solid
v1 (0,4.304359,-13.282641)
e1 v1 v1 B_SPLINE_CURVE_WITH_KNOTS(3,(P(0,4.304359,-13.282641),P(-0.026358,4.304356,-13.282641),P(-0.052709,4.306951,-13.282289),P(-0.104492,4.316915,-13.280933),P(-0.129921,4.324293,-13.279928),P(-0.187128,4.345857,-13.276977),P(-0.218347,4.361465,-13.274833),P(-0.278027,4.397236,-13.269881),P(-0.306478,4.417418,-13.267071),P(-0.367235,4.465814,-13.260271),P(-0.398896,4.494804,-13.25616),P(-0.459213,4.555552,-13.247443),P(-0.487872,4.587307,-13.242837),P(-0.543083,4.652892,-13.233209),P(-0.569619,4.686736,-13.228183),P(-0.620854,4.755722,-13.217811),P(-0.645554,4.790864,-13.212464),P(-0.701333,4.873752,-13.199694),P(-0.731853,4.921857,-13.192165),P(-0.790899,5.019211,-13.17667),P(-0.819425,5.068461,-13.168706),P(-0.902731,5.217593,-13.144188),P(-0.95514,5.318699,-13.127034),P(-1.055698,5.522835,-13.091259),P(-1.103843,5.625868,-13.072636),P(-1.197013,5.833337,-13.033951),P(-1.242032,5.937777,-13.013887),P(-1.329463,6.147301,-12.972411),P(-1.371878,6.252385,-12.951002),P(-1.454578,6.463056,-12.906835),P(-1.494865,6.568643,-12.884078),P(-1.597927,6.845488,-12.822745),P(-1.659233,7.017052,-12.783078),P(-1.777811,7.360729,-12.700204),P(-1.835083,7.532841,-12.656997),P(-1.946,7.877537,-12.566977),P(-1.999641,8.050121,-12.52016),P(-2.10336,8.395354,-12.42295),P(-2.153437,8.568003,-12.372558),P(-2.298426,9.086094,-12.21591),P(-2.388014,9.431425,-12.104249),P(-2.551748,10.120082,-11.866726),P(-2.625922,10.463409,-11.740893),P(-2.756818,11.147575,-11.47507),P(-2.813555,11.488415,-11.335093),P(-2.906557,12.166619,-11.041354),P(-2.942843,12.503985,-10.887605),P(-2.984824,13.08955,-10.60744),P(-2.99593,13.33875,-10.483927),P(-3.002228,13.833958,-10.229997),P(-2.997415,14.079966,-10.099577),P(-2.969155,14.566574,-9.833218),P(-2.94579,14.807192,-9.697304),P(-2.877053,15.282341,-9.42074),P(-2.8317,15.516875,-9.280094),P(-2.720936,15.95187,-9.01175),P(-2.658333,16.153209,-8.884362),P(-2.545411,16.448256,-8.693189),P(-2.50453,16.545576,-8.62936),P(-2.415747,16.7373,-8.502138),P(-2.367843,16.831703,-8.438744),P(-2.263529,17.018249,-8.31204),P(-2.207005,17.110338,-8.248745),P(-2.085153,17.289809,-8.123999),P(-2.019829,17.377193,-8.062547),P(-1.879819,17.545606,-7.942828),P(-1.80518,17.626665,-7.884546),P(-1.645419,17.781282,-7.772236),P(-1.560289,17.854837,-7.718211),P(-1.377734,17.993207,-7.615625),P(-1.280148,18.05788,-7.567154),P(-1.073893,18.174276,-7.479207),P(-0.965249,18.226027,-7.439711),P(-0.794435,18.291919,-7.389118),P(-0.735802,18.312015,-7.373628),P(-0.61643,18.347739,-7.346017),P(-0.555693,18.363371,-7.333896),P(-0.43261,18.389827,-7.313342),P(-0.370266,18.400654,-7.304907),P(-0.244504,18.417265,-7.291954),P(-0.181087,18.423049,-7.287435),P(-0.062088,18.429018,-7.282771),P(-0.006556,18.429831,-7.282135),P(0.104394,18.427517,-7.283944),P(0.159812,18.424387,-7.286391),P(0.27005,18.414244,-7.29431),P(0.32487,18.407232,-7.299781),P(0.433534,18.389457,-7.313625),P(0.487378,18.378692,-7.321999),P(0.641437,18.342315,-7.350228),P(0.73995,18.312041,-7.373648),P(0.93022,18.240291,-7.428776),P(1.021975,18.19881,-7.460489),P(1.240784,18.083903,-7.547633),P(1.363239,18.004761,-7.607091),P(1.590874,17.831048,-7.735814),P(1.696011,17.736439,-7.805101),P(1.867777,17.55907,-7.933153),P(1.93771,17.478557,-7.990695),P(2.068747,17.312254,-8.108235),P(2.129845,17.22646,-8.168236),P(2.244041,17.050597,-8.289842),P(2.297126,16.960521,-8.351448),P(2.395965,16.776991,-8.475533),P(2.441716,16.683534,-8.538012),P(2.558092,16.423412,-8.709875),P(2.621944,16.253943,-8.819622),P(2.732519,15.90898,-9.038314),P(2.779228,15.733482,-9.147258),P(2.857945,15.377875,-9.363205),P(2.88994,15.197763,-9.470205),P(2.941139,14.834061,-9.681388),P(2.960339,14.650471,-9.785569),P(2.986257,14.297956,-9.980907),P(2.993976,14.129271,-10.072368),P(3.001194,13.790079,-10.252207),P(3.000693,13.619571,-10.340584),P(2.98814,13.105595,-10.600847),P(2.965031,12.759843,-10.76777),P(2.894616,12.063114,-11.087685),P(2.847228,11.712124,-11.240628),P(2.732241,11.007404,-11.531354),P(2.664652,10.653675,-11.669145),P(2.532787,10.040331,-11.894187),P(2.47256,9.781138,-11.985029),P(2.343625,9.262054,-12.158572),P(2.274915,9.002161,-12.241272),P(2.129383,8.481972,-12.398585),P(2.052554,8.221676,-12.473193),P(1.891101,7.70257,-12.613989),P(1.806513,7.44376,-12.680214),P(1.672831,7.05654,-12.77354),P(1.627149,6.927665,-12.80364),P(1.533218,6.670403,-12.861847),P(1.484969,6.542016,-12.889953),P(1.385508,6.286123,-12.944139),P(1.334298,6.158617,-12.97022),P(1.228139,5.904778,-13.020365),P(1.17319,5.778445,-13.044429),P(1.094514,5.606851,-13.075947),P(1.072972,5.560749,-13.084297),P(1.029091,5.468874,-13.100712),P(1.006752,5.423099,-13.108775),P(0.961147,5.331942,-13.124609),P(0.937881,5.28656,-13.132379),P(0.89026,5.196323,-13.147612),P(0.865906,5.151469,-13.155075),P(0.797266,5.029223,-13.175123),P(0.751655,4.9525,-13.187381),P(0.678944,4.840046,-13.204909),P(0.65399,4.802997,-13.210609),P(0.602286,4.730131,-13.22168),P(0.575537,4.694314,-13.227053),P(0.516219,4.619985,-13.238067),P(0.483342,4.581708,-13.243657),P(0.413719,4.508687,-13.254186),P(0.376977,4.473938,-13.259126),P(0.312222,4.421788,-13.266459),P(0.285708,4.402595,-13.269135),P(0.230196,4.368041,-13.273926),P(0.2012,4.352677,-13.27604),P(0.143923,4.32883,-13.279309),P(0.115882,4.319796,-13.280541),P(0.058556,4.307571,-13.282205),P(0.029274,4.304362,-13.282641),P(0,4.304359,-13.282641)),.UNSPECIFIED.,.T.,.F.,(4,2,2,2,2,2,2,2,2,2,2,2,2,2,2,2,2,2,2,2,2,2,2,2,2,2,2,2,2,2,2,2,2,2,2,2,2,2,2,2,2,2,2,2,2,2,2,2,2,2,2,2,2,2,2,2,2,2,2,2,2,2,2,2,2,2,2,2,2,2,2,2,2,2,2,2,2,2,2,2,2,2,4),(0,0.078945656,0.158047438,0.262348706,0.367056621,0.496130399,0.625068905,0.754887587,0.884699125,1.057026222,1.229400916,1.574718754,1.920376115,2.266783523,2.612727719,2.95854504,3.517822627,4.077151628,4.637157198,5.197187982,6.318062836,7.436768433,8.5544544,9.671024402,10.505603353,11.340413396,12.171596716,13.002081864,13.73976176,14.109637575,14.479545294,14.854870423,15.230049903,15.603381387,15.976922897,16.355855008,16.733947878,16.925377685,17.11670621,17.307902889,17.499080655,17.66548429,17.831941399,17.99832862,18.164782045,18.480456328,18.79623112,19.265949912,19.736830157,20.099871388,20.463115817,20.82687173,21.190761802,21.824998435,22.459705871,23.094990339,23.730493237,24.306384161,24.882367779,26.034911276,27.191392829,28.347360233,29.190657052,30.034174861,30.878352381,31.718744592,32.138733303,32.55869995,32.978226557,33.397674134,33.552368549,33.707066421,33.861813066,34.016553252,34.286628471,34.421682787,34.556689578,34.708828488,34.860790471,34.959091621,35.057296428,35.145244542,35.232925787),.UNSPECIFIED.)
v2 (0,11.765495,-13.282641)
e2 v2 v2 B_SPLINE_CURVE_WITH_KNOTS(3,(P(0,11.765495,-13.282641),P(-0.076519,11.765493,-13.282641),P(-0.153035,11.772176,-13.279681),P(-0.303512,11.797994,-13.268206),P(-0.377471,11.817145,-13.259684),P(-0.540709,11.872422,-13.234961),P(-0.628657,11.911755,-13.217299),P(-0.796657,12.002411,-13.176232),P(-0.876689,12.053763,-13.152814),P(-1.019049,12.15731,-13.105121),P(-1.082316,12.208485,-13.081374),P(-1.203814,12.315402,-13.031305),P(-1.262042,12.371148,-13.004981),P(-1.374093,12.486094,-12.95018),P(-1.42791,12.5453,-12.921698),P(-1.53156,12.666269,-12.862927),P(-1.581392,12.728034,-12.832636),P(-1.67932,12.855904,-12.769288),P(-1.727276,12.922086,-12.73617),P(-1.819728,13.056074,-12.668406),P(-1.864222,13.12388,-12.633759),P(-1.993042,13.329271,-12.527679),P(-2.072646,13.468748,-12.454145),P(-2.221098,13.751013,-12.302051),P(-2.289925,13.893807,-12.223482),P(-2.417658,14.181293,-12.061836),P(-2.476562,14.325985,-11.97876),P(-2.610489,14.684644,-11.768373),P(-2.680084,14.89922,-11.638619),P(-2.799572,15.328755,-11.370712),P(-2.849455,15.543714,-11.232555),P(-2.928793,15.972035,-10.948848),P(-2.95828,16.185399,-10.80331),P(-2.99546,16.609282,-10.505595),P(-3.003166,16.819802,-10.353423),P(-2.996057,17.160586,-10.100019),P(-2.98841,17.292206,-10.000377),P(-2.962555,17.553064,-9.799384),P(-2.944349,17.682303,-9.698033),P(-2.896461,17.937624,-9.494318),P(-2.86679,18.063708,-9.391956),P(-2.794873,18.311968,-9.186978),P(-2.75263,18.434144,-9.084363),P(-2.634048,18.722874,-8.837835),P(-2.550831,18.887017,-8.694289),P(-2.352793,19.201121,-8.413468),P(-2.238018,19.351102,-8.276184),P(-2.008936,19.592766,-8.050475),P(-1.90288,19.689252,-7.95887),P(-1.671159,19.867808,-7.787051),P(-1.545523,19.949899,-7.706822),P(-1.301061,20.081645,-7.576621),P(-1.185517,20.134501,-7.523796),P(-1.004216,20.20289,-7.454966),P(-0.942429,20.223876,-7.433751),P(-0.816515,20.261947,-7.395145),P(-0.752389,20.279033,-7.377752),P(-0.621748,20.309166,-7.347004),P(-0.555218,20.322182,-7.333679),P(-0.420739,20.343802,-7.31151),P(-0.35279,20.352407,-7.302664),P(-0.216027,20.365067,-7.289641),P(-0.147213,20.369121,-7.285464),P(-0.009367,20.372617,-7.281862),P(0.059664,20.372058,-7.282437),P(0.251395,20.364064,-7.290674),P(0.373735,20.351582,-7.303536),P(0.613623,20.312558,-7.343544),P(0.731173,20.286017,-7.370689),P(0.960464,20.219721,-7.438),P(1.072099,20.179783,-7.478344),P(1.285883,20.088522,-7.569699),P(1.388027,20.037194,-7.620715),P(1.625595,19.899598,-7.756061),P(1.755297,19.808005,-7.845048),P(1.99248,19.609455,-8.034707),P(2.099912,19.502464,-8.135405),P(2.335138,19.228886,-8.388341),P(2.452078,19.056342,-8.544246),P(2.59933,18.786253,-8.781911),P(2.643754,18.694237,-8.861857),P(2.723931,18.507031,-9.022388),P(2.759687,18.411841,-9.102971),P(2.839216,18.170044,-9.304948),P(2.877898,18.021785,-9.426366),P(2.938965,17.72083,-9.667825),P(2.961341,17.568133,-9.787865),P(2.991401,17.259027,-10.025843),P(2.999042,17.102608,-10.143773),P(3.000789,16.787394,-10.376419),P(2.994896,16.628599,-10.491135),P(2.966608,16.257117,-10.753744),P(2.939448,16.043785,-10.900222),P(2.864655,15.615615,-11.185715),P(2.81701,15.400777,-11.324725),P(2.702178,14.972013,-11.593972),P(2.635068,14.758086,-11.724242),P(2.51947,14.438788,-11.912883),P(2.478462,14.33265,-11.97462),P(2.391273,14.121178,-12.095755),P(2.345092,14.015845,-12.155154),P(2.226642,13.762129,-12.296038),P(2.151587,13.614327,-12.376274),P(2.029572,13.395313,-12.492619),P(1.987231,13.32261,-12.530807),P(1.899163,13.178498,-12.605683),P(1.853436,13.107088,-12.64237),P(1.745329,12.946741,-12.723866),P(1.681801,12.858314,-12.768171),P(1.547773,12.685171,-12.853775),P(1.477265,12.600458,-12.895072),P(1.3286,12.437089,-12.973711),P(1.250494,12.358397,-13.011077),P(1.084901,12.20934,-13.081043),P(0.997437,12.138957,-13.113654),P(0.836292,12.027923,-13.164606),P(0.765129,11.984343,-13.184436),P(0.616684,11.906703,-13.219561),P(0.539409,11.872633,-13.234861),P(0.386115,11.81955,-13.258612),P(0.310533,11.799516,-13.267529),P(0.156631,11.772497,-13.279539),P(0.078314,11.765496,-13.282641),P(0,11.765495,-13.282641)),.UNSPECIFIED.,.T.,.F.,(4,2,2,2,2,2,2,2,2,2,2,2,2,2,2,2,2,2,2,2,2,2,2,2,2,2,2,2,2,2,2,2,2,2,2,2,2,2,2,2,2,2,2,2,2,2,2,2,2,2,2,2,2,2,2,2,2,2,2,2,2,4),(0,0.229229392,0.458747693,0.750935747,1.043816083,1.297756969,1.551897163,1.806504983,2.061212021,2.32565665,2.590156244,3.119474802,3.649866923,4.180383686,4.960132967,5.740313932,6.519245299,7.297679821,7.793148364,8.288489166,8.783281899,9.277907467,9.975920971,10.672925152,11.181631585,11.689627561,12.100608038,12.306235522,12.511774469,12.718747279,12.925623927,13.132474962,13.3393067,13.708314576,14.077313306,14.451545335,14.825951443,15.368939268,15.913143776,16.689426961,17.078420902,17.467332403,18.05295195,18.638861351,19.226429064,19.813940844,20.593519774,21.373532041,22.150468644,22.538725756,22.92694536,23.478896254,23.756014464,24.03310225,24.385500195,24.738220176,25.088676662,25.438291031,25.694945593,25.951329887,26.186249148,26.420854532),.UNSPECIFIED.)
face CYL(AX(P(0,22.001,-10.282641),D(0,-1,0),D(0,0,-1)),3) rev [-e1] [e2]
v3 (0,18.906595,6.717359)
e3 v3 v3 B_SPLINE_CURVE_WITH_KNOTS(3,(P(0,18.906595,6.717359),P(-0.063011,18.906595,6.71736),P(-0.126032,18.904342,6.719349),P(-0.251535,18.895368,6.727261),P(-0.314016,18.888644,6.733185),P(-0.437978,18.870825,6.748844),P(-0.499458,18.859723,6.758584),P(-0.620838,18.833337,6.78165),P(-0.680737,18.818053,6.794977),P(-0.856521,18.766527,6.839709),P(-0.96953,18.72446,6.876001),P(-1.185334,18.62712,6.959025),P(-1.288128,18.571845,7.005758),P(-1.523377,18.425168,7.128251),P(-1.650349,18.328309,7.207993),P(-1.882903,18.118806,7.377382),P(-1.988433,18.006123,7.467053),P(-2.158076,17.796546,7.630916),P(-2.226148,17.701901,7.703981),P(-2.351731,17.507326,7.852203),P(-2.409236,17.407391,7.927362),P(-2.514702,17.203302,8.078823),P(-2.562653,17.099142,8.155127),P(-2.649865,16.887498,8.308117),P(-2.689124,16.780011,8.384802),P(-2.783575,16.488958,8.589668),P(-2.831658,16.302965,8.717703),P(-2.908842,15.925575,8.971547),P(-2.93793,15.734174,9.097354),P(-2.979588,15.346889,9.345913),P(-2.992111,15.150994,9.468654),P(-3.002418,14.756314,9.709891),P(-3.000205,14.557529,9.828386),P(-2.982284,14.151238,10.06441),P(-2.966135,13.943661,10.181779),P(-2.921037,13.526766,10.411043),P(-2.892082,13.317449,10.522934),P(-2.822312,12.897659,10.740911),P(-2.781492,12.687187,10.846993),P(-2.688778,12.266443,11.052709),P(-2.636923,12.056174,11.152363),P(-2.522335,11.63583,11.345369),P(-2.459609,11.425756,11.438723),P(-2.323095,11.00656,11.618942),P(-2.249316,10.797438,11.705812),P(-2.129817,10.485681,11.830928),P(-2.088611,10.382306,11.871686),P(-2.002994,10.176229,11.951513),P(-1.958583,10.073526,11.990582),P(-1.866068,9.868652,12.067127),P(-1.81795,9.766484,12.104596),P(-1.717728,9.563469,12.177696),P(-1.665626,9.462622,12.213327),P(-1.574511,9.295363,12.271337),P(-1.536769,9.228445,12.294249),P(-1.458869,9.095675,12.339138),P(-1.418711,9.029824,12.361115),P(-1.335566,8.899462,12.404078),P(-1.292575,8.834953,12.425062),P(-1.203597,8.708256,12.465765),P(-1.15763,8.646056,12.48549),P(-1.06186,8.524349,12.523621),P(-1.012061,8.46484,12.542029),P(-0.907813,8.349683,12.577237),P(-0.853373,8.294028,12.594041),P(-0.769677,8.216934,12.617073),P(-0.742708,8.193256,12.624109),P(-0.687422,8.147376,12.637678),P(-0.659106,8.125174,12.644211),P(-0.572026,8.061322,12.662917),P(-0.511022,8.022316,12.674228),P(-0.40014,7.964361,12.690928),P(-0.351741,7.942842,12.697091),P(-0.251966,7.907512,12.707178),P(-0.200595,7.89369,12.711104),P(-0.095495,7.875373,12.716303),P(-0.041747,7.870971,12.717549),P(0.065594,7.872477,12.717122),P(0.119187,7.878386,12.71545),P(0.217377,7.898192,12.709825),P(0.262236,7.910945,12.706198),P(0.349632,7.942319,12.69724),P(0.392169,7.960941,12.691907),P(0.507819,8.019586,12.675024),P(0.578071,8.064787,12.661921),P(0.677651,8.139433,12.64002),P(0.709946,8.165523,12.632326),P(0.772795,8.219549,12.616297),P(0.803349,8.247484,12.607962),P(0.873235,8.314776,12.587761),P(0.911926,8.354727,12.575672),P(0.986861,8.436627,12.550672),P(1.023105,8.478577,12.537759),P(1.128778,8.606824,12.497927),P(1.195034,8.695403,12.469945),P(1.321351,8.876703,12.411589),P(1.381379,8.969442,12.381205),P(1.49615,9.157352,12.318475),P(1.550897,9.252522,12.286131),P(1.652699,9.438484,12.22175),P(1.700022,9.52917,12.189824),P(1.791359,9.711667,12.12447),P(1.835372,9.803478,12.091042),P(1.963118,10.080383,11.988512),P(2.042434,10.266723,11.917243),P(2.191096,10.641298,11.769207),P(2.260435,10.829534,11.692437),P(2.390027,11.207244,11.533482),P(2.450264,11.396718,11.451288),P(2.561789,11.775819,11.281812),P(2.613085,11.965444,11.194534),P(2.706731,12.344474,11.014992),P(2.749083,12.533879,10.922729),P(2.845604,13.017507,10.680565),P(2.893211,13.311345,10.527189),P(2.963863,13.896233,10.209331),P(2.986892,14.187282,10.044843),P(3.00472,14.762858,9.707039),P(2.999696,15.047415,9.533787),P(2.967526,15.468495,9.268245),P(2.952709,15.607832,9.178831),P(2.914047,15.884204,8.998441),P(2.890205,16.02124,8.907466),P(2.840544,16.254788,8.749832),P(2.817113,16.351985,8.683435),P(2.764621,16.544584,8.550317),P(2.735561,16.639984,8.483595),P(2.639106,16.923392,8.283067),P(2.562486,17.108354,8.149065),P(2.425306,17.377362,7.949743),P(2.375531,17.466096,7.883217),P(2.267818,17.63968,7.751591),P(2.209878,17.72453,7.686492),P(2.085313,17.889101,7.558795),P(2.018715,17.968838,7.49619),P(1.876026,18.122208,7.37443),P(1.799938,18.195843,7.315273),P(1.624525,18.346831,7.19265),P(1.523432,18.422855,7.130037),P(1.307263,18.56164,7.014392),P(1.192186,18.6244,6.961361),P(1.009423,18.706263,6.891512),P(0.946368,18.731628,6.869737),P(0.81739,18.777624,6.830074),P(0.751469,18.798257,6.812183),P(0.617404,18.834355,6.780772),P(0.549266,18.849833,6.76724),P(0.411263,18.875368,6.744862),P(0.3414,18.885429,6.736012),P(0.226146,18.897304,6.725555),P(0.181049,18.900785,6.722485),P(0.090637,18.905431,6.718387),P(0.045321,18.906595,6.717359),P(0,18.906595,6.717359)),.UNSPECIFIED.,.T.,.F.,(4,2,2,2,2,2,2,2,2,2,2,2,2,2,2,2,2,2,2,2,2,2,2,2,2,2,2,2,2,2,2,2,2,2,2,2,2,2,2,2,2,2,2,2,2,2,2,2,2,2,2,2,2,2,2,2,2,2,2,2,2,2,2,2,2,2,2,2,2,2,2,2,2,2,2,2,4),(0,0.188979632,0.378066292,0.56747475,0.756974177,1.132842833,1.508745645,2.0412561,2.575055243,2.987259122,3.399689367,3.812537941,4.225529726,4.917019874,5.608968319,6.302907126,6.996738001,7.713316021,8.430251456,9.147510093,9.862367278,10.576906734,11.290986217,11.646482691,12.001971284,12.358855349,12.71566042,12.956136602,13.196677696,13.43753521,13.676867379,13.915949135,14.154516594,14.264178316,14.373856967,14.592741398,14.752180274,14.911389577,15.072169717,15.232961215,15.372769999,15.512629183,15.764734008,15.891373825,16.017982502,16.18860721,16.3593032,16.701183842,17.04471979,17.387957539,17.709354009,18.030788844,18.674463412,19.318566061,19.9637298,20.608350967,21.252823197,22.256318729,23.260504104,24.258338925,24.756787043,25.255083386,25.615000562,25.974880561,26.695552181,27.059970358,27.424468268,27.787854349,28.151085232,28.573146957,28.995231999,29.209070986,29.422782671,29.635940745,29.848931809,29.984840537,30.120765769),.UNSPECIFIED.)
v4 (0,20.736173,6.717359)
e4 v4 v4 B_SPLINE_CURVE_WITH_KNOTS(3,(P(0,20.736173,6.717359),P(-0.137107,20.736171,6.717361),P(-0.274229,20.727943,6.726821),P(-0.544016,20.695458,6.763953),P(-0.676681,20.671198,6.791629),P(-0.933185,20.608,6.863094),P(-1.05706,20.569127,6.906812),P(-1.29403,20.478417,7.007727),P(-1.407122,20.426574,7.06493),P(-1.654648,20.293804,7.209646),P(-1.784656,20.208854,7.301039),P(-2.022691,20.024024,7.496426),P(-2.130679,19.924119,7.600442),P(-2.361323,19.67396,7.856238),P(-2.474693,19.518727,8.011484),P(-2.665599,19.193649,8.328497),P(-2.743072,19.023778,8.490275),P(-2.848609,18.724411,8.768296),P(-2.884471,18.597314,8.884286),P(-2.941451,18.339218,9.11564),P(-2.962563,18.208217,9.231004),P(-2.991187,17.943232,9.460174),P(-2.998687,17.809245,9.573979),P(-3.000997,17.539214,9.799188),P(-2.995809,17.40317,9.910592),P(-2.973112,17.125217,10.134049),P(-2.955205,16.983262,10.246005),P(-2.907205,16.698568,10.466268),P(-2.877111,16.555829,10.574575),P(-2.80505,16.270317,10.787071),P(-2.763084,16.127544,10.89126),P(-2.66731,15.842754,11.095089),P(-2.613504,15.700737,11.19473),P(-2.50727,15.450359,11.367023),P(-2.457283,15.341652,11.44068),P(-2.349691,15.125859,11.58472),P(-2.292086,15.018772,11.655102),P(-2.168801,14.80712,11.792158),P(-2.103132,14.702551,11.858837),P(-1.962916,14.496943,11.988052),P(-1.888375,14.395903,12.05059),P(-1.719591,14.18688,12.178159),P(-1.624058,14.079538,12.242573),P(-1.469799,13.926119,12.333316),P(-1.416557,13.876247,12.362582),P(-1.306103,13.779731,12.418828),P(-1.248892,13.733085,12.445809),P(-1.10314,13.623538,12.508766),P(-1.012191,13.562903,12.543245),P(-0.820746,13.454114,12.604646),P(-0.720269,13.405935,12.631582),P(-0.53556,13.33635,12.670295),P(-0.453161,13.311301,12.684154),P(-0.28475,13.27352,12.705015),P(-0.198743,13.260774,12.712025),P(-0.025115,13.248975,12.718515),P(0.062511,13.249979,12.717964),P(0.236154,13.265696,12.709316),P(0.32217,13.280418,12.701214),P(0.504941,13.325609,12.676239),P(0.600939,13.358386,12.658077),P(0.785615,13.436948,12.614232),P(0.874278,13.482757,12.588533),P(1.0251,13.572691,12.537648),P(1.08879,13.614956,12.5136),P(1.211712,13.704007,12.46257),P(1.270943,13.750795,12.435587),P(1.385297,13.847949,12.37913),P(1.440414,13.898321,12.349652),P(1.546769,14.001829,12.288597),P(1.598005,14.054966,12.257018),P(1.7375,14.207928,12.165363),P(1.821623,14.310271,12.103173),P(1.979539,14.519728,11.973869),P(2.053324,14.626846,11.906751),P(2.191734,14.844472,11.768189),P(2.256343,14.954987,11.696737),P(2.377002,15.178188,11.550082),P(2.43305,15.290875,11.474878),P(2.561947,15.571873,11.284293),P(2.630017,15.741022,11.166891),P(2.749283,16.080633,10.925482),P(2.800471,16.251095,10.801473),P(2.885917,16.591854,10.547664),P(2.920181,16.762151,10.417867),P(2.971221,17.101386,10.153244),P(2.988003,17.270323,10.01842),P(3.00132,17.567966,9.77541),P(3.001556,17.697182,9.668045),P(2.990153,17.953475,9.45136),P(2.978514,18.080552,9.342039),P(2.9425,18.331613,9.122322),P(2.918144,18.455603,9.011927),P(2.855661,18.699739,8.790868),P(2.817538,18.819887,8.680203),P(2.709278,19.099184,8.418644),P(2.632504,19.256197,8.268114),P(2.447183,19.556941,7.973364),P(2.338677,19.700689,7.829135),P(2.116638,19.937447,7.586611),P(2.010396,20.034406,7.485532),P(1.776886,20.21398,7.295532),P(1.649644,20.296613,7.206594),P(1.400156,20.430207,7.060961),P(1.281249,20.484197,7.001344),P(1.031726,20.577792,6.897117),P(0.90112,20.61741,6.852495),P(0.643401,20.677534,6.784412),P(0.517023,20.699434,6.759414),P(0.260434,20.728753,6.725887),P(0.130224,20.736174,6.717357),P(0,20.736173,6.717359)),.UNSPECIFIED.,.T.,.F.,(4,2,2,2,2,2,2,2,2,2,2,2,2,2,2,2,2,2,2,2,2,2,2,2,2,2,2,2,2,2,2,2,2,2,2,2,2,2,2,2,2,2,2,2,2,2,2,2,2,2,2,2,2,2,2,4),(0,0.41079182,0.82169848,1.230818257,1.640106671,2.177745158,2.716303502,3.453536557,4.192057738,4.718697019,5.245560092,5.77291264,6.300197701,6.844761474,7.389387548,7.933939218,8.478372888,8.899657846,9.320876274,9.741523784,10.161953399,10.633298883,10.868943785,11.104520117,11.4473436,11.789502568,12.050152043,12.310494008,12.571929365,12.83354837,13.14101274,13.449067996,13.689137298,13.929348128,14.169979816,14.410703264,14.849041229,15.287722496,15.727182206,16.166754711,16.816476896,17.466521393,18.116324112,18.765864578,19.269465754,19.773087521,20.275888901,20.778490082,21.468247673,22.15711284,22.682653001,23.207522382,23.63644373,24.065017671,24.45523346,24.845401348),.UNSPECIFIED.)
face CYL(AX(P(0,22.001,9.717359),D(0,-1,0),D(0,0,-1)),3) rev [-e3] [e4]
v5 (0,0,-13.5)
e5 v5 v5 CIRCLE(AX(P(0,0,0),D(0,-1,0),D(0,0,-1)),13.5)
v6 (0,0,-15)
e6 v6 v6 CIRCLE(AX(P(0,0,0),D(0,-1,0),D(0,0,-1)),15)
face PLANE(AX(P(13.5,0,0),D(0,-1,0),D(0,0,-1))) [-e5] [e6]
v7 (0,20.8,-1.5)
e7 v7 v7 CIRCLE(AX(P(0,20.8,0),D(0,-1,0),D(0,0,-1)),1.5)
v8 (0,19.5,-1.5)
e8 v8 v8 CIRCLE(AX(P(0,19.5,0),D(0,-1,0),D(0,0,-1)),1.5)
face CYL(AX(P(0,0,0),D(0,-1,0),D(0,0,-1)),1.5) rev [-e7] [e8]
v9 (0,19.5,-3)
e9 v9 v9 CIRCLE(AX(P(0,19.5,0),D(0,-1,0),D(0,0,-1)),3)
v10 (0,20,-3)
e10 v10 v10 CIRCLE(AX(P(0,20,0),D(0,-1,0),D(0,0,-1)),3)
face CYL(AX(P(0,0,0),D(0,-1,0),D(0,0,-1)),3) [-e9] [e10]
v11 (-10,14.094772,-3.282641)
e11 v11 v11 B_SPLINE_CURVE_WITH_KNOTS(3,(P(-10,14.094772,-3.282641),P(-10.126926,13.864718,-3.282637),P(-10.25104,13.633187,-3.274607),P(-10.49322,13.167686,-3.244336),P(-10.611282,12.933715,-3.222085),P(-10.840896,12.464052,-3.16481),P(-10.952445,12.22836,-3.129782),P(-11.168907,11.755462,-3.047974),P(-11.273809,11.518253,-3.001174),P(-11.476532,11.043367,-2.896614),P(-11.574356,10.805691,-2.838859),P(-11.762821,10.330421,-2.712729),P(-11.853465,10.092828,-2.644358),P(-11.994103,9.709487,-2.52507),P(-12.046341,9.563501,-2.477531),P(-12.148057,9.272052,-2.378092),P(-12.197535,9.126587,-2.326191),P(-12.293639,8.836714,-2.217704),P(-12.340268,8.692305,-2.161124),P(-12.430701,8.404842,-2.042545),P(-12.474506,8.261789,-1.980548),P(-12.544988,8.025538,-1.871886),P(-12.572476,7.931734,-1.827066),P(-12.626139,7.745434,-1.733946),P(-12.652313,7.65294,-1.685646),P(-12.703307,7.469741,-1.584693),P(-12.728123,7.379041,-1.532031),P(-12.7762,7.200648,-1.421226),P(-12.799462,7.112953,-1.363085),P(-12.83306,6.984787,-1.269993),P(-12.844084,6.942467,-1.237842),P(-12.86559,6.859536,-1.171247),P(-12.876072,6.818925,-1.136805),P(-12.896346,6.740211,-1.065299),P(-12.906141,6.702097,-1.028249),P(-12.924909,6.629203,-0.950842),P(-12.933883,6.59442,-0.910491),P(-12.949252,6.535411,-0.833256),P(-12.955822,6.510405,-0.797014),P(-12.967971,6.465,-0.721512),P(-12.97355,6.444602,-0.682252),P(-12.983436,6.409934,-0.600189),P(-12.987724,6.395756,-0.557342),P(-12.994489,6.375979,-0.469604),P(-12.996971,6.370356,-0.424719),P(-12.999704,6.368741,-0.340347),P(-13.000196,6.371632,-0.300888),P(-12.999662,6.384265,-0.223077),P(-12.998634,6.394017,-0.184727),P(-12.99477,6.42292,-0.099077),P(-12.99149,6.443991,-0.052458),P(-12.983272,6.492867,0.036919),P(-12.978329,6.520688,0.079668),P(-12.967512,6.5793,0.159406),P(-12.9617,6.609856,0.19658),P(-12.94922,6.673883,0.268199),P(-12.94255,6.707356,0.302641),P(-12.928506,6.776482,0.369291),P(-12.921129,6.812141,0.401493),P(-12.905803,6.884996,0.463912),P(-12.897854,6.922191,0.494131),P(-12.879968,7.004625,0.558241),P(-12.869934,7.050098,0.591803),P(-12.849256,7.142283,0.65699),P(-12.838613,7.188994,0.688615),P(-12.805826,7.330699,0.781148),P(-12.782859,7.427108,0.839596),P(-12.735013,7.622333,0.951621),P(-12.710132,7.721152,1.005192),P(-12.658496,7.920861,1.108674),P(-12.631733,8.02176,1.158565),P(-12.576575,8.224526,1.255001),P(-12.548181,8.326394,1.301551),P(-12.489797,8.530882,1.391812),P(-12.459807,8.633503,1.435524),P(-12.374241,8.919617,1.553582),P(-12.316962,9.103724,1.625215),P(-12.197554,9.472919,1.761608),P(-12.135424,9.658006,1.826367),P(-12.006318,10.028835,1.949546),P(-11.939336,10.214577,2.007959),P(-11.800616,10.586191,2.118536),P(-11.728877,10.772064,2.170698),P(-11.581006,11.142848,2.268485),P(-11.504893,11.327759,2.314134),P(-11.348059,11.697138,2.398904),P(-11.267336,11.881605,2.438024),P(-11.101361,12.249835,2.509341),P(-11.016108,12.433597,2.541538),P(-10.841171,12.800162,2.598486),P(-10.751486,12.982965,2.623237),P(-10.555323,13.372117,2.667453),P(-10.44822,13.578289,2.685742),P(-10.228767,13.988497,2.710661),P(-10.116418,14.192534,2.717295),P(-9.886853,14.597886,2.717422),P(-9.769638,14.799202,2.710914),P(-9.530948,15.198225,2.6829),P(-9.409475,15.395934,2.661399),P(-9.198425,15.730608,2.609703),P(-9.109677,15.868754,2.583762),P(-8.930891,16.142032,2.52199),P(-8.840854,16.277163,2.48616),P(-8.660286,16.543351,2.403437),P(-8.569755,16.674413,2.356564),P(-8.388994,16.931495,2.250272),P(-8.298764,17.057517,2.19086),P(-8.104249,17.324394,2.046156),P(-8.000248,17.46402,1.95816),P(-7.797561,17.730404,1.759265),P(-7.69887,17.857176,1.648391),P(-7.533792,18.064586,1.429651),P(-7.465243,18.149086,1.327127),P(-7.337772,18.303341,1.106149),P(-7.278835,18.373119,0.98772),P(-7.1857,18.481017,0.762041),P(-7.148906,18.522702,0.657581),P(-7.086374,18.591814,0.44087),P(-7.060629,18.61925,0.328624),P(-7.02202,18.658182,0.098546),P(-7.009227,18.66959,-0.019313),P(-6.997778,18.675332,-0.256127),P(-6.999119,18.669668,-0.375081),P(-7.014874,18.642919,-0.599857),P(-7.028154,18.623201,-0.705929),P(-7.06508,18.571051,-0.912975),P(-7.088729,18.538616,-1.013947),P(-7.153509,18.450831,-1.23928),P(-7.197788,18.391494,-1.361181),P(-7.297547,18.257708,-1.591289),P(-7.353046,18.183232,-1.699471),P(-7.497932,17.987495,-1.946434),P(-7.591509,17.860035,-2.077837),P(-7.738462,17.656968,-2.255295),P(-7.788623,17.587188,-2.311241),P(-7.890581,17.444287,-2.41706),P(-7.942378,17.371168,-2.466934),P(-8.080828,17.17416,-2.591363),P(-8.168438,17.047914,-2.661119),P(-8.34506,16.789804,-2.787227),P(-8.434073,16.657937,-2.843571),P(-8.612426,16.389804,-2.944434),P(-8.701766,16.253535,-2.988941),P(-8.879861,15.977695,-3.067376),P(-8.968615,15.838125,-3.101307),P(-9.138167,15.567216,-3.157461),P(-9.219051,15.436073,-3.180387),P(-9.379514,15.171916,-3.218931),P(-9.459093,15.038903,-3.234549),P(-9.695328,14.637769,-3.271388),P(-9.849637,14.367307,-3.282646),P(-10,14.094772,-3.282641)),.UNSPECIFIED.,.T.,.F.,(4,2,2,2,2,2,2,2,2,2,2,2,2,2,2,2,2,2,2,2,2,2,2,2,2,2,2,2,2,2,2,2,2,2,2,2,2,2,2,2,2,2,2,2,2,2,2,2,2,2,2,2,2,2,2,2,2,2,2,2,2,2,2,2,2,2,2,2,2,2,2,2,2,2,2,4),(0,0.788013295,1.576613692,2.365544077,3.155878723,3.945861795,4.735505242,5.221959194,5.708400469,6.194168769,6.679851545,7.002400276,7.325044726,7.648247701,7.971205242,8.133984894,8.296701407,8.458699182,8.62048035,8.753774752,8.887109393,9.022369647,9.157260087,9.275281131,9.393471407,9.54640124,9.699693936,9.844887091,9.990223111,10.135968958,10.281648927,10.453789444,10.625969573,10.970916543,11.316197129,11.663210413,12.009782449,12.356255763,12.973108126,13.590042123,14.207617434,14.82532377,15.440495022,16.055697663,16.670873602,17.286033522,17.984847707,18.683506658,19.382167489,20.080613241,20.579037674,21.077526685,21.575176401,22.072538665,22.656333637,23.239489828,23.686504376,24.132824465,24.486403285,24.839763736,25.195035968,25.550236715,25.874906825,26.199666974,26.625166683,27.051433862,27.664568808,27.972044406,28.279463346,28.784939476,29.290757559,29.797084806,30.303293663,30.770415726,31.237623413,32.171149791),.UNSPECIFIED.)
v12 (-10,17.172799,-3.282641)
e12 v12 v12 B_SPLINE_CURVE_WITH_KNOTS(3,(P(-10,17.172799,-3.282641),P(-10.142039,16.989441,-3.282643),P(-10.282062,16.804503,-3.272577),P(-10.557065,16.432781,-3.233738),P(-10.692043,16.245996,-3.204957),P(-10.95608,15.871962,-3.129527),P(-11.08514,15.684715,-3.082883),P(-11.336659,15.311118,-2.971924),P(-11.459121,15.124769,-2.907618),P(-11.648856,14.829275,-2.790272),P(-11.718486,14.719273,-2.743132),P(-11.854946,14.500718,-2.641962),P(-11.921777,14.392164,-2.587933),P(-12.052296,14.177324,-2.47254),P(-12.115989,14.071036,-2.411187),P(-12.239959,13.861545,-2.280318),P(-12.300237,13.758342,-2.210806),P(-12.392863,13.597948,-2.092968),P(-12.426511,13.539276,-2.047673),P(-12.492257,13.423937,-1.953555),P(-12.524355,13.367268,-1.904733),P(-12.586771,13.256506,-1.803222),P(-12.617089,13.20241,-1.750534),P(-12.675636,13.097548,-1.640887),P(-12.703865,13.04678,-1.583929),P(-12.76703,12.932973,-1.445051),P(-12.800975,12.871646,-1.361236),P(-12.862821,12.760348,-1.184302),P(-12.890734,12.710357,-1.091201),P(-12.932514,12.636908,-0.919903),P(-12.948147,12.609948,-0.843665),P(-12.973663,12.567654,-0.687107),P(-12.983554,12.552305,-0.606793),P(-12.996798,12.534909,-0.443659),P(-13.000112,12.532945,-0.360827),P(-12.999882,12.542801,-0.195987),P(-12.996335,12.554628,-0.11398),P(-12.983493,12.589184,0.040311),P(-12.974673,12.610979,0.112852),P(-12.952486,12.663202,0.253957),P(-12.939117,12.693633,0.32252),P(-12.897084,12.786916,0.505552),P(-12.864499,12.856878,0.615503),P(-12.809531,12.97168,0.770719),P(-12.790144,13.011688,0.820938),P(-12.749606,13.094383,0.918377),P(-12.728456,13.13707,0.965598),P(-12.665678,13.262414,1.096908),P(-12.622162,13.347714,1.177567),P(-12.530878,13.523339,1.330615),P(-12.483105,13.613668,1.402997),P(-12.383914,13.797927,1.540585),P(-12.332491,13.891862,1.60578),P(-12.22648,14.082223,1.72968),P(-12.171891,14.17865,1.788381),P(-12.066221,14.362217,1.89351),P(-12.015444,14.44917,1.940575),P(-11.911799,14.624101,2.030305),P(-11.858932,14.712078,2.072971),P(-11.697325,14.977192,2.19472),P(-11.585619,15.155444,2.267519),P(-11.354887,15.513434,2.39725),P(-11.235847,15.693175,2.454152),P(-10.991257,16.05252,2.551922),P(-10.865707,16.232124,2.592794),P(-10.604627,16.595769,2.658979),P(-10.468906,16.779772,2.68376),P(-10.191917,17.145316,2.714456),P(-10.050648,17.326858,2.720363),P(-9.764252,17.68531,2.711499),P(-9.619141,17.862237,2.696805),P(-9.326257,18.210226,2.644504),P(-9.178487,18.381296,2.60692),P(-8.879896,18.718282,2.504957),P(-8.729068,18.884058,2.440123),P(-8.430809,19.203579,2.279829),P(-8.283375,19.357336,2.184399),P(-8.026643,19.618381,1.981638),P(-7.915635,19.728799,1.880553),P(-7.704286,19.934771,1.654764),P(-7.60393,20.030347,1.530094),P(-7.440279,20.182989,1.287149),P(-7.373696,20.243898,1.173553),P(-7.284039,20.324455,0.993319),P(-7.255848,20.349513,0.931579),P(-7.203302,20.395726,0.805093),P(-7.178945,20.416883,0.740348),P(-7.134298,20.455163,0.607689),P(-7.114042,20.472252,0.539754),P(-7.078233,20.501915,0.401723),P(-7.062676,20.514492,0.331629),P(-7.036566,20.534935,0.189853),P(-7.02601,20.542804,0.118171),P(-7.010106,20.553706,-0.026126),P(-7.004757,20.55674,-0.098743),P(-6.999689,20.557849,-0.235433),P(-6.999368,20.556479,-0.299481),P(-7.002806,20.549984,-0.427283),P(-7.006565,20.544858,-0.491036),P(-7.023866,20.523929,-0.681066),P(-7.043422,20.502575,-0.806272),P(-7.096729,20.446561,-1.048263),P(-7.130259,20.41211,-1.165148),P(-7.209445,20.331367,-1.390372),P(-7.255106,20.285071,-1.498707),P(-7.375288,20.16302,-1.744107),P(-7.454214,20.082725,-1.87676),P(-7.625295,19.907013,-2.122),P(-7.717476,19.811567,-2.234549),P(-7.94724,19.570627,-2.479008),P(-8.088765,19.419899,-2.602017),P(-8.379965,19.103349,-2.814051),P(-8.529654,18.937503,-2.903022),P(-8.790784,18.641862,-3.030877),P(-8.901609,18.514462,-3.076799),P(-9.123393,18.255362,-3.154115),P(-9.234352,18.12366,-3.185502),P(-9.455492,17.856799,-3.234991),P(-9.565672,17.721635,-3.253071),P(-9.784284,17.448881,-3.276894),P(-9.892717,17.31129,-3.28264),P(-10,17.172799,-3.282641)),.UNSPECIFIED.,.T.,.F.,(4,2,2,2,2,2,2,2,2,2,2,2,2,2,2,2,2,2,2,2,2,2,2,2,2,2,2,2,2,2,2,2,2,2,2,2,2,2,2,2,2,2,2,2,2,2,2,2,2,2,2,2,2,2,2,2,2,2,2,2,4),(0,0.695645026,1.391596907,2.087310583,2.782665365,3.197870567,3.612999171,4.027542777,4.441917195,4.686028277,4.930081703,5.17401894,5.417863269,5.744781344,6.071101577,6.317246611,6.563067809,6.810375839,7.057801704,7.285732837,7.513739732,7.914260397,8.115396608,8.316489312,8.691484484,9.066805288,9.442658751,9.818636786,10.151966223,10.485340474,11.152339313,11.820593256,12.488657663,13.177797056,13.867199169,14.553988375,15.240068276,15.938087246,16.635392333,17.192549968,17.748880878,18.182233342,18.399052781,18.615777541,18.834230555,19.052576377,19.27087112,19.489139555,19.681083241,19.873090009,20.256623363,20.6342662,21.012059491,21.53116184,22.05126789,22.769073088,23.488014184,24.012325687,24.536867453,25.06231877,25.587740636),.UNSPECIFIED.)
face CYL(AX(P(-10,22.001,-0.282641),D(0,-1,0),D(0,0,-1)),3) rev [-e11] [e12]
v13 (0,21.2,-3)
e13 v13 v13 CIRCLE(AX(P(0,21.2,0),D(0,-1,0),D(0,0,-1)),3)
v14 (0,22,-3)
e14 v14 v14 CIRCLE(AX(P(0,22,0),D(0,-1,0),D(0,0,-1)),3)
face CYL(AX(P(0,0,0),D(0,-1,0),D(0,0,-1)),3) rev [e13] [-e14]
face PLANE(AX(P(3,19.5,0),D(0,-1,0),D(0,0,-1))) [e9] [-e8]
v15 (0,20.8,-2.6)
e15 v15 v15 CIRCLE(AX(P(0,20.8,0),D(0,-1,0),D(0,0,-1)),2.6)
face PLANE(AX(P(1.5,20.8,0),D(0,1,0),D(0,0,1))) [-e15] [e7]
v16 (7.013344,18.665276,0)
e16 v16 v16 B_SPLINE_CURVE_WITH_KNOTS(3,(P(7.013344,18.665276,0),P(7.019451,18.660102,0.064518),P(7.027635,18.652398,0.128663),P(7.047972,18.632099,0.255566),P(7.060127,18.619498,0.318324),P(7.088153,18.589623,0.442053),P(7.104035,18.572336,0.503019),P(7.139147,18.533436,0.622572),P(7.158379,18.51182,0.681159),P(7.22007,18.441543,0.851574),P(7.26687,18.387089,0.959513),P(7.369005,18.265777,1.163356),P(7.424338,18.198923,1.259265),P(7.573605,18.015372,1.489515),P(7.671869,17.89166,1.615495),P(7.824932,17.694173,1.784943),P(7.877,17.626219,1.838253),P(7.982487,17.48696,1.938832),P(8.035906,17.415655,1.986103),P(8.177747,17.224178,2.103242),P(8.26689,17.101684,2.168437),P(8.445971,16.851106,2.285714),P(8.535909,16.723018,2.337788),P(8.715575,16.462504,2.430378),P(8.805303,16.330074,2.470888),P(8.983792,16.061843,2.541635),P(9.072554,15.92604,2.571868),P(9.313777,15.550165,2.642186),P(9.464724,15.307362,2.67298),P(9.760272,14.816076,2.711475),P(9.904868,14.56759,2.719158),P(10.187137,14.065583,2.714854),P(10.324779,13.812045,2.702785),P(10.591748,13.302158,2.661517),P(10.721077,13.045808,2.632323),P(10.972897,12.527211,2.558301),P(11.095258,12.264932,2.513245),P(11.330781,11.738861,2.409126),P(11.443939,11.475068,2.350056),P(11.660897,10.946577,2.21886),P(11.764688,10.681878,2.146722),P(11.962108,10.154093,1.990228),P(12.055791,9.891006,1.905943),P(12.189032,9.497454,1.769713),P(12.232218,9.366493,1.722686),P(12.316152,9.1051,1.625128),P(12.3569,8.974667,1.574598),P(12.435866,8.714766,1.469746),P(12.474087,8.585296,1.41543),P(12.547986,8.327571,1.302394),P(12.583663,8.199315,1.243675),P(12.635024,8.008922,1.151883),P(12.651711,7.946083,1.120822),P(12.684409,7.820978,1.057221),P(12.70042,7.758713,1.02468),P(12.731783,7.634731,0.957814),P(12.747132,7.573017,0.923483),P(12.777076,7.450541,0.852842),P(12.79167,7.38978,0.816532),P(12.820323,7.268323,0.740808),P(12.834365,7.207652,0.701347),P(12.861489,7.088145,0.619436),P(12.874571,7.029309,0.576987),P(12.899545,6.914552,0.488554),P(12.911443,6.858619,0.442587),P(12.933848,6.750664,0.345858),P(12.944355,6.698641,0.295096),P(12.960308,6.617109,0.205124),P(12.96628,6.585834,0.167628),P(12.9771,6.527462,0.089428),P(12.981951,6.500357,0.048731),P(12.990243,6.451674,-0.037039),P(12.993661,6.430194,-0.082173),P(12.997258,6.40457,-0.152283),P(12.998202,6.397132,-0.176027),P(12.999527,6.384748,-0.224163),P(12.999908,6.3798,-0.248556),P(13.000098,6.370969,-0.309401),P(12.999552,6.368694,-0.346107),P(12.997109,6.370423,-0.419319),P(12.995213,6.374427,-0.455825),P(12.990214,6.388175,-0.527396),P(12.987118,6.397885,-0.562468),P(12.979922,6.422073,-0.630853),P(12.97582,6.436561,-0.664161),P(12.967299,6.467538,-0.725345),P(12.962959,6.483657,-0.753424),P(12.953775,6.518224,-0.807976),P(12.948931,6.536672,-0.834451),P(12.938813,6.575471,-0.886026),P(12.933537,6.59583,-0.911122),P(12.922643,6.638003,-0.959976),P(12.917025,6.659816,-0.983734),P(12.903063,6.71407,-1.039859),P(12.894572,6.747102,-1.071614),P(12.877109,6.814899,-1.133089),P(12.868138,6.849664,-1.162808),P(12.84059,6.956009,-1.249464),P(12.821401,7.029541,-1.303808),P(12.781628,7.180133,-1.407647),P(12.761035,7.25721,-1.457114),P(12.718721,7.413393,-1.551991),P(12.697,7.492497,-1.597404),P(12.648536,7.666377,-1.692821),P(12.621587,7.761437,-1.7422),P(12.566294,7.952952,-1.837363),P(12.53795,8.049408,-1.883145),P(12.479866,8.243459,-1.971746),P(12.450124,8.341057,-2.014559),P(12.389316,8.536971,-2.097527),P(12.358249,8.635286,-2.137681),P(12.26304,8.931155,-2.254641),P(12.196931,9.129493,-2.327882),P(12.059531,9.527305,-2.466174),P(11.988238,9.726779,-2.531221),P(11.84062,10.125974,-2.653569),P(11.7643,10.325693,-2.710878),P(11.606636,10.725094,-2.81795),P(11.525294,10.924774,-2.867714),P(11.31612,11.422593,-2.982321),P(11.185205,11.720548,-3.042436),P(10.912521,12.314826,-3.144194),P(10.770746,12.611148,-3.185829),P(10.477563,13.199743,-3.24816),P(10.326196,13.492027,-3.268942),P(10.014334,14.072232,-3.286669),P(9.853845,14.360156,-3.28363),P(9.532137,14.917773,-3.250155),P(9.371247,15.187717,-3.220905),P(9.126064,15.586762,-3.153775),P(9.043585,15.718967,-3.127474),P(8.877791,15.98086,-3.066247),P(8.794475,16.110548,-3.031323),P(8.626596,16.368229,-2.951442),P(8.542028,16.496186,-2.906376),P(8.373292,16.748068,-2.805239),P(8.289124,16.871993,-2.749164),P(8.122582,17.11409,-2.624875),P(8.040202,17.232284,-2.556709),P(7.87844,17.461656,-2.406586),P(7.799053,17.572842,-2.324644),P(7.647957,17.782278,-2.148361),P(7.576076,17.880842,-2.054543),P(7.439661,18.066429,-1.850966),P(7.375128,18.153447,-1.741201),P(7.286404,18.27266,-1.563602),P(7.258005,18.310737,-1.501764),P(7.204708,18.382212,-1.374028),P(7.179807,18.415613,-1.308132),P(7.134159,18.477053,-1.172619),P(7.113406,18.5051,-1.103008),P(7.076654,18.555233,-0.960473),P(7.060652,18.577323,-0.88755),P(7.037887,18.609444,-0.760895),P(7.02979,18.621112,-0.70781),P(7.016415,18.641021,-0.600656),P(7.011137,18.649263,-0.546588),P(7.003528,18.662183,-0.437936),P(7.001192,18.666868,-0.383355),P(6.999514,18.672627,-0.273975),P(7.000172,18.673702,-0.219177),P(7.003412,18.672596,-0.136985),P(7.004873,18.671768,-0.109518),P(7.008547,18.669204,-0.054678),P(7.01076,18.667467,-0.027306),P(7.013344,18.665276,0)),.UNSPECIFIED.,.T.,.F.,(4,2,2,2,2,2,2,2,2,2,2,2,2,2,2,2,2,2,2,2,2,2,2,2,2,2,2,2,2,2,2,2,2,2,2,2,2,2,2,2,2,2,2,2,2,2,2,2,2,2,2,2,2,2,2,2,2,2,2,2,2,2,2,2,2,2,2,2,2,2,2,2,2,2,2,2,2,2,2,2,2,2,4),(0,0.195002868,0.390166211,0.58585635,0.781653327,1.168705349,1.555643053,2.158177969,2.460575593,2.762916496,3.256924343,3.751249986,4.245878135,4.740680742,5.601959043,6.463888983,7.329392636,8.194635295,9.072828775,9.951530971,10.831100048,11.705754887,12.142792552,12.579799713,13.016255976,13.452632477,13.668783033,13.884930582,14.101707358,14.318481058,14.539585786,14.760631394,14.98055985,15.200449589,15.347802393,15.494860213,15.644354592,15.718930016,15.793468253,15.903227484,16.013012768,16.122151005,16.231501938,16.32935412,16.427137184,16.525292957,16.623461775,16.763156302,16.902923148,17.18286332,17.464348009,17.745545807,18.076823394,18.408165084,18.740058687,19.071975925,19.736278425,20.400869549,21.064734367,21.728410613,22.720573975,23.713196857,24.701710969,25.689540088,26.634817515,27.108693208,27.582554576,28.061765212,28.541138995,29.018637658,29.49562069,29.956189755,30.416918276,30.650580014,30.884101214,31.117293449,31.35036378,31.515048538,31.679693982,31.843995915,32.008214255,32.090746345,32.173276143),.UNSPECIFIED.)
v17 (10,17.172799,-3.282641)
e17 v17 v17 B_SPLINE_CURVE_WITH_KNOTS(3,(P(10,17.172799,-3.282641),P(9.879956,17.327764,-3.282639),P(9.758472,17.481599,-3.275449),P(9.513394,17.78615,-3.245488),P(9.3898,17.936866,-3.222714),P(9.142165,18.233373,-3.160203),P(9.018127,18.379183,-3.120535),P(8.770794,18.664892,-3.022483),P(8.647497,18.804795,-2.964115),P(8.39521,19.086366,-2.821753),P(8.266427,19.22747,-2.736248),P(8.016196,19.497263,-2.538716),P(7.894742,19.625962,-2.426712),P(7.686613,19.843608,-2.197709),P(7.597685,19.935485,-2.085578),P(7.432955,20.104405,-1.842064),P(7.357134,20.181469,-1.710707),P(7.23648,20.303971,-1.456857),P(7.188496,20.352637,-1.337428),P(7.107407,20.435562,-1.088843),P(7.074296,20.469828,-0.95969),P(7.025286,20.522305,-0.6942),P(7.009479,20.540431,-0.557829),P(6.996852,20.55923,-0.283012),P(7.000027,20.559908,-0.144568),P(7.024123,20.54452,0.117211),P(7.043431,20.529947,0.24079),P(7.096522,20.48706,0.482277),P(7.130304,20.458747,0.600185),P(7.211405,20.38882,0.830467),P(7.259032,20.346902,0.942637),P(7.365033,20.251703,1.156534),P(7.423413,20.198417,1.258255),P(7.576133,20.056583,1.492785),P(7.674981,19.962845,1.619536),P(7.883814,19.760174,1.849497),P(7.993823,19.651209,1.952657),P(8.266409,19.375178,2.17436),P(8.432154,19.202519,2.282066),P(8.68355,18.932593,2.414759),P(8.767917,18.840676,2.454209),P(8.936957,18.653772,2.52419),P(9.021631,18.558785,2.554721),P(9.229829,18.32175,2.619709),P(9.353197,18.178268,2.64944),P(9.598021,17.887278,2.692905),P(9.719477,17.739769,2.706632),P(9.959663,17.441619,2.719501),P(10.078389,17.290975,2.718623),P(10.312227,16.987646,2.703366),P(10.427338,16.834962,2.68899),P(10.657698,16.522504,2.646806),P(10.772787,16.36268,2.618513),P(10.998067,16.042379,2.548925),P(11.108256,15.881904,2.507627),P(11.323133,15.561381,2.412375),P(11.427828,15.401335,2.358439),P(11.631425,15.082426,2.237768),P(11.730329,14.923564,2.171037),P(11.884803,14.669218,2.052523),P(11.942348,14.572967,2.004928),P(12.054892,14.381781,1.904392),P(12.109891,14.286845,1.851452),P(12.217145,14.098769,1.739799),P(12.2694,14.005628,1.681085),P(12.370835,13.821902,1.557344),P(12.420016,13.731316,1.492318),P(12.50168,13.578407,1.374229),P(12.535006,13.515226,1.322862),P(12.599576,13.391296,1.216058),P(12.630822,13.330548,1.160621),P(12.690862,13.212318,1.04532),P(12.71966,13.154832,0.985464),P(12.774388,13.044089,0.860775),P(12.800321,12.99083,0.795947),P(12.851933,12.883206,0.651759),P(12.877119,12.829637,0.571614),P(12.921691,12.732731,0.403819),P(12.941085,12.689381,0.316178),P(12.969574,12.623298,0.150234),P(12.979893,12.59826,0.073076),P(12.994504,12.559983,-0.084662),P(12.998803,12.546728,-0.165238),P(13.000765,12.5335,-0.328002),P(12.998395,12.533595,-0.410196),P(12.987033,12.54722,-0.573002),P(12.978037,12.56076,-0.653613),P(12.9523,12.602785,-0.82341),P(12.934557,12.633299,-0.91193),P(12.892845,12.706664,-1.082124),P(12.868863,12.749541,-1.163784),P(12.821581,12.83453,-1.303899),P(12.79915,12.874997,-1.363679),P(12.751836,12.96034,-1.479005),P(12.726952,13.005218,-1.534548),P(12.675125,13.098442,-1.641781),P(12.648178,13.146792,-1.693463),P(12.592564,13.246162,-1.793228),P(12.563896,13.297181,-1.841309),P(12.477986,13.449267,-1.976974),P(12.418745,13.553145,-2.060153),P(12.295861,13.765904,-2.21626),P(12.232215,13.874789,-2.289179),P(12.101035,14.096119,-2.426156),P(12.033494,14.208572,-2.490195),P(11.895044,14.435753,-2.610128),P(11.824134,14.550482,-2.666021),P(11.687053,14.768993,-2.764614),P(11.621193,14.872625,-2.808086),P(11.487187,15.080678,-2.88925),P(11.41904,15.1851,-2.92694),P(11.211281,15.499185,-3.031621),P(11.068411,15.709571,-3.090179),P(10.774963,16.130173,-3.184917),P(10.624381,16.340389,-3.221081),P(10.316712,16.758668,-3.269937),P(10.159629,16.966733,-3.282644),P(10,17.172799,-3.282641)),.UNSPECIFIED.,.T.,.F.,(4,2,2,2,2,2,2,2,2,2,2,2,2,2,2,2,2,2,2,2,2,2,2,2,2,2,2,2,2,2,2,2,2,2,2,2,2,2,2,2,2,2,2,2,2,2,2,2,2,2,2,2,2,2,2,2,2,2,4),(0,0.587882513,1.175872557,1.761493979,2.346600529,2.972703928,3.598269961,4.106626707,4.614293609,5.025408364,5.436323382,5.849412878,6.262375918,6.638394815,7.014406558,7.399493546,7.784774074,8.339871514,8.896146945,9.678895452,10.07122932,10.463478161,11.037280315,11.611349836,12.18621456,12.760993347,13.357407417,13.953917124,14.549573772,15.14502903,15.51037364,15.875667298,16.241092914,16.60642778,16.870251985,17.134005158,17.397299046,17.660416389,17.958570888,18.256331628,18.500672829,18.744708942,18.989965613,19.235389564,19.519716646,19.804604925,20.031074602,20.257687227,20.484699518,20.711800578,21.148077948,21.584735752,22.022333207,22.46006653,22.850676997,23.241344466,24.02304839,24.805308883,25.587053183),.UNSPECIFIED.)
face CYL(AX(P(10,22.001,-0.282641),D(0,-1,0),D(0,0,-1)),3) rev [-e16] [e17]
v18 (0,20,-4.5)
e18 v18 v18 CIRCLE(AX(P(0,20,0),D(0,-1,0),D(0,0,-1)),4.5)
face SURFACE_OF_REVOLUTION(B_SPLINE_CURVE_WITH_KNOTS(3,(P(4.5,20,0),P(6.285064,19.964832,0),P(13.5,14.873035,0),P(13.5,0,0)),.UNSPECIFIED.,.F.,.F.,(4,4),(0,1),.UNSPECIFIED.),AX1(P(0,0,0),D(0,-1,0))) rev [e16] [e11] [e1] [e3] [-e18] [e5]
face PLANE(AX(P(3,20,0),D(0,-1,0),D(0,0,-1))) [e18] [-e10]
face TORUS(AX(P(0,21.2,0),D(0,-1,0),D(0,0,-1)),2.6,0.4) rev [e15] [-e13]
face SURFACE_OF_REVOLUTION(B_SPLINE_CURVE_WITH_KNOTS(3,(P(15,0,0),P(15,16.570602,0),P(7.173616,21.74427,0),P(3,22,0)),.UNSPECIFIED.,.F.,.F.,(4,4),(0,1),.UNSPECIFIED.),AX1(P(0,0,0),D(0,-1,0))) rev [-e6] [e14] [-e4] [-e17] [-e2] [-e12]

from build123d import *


with BuildPart() as part:
    # Эскиз1 → Повернуть1 (revolve)
    with BuildSketch(Plane.XY, mode=Mode.PRIVATE) as revolve_1_sk:
        with BuildLine():
            Line((13.5, 0), (15, 0))
            add(Edge.make_bspline(
                [(15, 0), (15, 16.570601506), (7.173616496, 21.744270336), (3, 22)],
                knots=[0, 0, 0, 0, 1, 1, 1, 1], degree=3))
            Line((3, 22), (3, 21.2))
            ThreePointArc((3, 21.2), (2.882842712, 20.917157288), (2.6, 20.8))
            Line((2.6, 20.8), (1.5, 20.8))
            Line((1.5, 20.8), (1.5, 19.5))
            Line((1.5, 19.5), (3, 19.5))
            Line((3, 19.5), (3, 20))
            Line((3, 20), (4.5, 20))
            add(Edge.make_bspline(
                [(13.5, 0), (13.5, 14.873035427), (6.285064211, 19.96483175), (4.5, 20)],
                knots=[0, 0, 0, 0, 1, 1, 1, 1], degree=3))
        make_face()
    revolve(revolve_1_sk.sketch.rotate(Axis((0, 0, 0), (0, 1, 0)), 90), axis=Axis((0, 0, 0), (0, 1, 0)))

    # Вырез-Вытянуть2: read off the stored shape, not the designer's step
    # Вырез-Вытянуть2: loft between two sections, ruled curve by curve
    cut_extrude_2_from = [
        Edge.make_three_point_arc((10, 20.557685128, -3.282641035), (13, 20.557685128, -0.282641035), (10, 20.557685128, 2.717358965)),
        Edge.make_three_point_arc((10, 20.557685128, 2.717358965), (7, 20.557685128, -0.282641035), (10, 20.557685128, -3.282641035)),
    ]
    cut_extrude_2_to = [
        Edge.make_three_point_arc((10, 6.366915716, -3.282641035), (13, 6.366915716, -0.282641035), (10, 6.366915716, 2.717358965)),
        Edge.make_three_point_arc((10, 6.366915716, 2.717358965), (7, 6.366915716, -0.282641035), (10, 6.366915716, -3.282641035)),
    ]
    cut_extrude_2 = Solid(Shell([*[Face.make_surface_from_curves(cut_extrude_2_from[k], cut_extrude_2_to[k]) for k in range(2)], Face(Wire(cut_extrude_2_from)), Face(Wire(cut_extrude_2_to))]))
    add(cut_extrude_2, mode=Mode.SUBTRACT)

    # Cut-Extrude 2 2: loft between two sections, ruled curve by curve
    cut_extrude_2_2_from = [
        Edge.make_three_point_arc((0, 20.371865001, -13.282641035), (3, 20.371865001, -10.282641035), (0, 20.371865001, -7.282641035)),
        Edge.make_three_point_arc((0, 20.371865001, -7.282641035), (-3, 20.371865001, -10.282641035), (0, 20.371865001, -13.282641035)),
    ]
    cut_extrude_2_2_to = [
        Edge.make_three_point_arc((0, 4.304185555, -13.282641035), (3, 4.304185555, -10.282641035), (0, 4.304185555, -7.282641035)),
        Edge.make_three_point_arc((0, 4.304185555, -7.282641035), (-3, 4.304185555, -10.282641035), (0, 4.304185555, -13.282641035)),
    ]
    cut_extrude_2_2 = Solid(Shell([*[Face.make_surface_from_curves(cut_extrude_2_2_from[k], cut_extrude_2_2_to[k]) for k in range(2)], Face(Wire(cut_extrude_2_2_from)), Face(Wire(cut_extrude_2_2_to))]))
    add(cut_extrude_2_2, mode=Mode.SUBTRACT)

    # Cut-Extrude 2 3: loft between two sections, ruled curve by curve
    cut_extrude_2_3_from = [
        Edge.make_three_point_arc((-10, 20.557693397, -3.282641035), (-7, 20.557693397, -0.282641035), (-10, 20.557693397, 2.717358965)),
        Edge.make_three_point_arc((-10, 20.557693397, 2.717358965), (-13, 20.557693397, -0.282641035), (-10, 20.557693397, -3.282641035)),
    ]
    cut_extrude_2_3_to = [
        Edge.make_three_point_arc((-10, 6.366921079, -3.282641035), (-7, 6.366921079, -0.282641035), (-10, 6.366921079, 2.717358965)),
        Edge.make_three_point_arc((-10, 6.366921079, 2.717358965), (-13, 6.366921079, -0.282641035), (-10, 6.366921079, -3.282641035)),
    ]
    cut_extrude_2_3 = Solid(Shell([*[Face.make_surface_from_curves(cut_extrude_2_3_from[k], cut_extrude_2_3_to[k]) for k in range(2)], Face(Wire(cut_extrude_2_3_from)), Face(Wire(cut_extrude_2_3_to))]))
    add(cut_extrude_2_3, mode=Mode.SUBTRACT)

    # Cut-Extrude 2 4: loft between two sections, ruled curve by curve
    cut_extrude_2_4_from = [
        Edge.make_three_point_arc((0, 20.736172935, 6.717358965), (3, 20.736172935, 9.717358965), (0, 20.736172935, 12.717358965)),
        Edge.make_three_point_arc((0, 20.736172935, 12.717358965), (-3, 20.736172935, 9.717358965), (0, 20.736172935, 6.717358965)),
    ]
    cut_extrude_2_4_to = [
        Edge.make_three_point_arc((0, 7.869738173, 6.717358965), (3, 7.869738173, 9.717358965), (0, 7.869738173, 12.717358965)),
        Edge.make_three_point_arc((0, 7.869738173, 12.717358965), (-3, 7.869738173, 9.717358965), (0, 7.869738173, 6.717358965)),
    ]
    cut_extrude_2_4 = Solid(Shell([*[Face.make_surface_from_curves(cut_extrude_2_4_from[k], cut_extrude_2_4_to[k]) for k in range(2)], Face(Wire(cut_extrude_2_4_from)), Face(Wire(cut_extrude_2_4_to))]))
    add(cut_extrude_2_4, mode=Mode.SUBTRACT)


solid = part.part
